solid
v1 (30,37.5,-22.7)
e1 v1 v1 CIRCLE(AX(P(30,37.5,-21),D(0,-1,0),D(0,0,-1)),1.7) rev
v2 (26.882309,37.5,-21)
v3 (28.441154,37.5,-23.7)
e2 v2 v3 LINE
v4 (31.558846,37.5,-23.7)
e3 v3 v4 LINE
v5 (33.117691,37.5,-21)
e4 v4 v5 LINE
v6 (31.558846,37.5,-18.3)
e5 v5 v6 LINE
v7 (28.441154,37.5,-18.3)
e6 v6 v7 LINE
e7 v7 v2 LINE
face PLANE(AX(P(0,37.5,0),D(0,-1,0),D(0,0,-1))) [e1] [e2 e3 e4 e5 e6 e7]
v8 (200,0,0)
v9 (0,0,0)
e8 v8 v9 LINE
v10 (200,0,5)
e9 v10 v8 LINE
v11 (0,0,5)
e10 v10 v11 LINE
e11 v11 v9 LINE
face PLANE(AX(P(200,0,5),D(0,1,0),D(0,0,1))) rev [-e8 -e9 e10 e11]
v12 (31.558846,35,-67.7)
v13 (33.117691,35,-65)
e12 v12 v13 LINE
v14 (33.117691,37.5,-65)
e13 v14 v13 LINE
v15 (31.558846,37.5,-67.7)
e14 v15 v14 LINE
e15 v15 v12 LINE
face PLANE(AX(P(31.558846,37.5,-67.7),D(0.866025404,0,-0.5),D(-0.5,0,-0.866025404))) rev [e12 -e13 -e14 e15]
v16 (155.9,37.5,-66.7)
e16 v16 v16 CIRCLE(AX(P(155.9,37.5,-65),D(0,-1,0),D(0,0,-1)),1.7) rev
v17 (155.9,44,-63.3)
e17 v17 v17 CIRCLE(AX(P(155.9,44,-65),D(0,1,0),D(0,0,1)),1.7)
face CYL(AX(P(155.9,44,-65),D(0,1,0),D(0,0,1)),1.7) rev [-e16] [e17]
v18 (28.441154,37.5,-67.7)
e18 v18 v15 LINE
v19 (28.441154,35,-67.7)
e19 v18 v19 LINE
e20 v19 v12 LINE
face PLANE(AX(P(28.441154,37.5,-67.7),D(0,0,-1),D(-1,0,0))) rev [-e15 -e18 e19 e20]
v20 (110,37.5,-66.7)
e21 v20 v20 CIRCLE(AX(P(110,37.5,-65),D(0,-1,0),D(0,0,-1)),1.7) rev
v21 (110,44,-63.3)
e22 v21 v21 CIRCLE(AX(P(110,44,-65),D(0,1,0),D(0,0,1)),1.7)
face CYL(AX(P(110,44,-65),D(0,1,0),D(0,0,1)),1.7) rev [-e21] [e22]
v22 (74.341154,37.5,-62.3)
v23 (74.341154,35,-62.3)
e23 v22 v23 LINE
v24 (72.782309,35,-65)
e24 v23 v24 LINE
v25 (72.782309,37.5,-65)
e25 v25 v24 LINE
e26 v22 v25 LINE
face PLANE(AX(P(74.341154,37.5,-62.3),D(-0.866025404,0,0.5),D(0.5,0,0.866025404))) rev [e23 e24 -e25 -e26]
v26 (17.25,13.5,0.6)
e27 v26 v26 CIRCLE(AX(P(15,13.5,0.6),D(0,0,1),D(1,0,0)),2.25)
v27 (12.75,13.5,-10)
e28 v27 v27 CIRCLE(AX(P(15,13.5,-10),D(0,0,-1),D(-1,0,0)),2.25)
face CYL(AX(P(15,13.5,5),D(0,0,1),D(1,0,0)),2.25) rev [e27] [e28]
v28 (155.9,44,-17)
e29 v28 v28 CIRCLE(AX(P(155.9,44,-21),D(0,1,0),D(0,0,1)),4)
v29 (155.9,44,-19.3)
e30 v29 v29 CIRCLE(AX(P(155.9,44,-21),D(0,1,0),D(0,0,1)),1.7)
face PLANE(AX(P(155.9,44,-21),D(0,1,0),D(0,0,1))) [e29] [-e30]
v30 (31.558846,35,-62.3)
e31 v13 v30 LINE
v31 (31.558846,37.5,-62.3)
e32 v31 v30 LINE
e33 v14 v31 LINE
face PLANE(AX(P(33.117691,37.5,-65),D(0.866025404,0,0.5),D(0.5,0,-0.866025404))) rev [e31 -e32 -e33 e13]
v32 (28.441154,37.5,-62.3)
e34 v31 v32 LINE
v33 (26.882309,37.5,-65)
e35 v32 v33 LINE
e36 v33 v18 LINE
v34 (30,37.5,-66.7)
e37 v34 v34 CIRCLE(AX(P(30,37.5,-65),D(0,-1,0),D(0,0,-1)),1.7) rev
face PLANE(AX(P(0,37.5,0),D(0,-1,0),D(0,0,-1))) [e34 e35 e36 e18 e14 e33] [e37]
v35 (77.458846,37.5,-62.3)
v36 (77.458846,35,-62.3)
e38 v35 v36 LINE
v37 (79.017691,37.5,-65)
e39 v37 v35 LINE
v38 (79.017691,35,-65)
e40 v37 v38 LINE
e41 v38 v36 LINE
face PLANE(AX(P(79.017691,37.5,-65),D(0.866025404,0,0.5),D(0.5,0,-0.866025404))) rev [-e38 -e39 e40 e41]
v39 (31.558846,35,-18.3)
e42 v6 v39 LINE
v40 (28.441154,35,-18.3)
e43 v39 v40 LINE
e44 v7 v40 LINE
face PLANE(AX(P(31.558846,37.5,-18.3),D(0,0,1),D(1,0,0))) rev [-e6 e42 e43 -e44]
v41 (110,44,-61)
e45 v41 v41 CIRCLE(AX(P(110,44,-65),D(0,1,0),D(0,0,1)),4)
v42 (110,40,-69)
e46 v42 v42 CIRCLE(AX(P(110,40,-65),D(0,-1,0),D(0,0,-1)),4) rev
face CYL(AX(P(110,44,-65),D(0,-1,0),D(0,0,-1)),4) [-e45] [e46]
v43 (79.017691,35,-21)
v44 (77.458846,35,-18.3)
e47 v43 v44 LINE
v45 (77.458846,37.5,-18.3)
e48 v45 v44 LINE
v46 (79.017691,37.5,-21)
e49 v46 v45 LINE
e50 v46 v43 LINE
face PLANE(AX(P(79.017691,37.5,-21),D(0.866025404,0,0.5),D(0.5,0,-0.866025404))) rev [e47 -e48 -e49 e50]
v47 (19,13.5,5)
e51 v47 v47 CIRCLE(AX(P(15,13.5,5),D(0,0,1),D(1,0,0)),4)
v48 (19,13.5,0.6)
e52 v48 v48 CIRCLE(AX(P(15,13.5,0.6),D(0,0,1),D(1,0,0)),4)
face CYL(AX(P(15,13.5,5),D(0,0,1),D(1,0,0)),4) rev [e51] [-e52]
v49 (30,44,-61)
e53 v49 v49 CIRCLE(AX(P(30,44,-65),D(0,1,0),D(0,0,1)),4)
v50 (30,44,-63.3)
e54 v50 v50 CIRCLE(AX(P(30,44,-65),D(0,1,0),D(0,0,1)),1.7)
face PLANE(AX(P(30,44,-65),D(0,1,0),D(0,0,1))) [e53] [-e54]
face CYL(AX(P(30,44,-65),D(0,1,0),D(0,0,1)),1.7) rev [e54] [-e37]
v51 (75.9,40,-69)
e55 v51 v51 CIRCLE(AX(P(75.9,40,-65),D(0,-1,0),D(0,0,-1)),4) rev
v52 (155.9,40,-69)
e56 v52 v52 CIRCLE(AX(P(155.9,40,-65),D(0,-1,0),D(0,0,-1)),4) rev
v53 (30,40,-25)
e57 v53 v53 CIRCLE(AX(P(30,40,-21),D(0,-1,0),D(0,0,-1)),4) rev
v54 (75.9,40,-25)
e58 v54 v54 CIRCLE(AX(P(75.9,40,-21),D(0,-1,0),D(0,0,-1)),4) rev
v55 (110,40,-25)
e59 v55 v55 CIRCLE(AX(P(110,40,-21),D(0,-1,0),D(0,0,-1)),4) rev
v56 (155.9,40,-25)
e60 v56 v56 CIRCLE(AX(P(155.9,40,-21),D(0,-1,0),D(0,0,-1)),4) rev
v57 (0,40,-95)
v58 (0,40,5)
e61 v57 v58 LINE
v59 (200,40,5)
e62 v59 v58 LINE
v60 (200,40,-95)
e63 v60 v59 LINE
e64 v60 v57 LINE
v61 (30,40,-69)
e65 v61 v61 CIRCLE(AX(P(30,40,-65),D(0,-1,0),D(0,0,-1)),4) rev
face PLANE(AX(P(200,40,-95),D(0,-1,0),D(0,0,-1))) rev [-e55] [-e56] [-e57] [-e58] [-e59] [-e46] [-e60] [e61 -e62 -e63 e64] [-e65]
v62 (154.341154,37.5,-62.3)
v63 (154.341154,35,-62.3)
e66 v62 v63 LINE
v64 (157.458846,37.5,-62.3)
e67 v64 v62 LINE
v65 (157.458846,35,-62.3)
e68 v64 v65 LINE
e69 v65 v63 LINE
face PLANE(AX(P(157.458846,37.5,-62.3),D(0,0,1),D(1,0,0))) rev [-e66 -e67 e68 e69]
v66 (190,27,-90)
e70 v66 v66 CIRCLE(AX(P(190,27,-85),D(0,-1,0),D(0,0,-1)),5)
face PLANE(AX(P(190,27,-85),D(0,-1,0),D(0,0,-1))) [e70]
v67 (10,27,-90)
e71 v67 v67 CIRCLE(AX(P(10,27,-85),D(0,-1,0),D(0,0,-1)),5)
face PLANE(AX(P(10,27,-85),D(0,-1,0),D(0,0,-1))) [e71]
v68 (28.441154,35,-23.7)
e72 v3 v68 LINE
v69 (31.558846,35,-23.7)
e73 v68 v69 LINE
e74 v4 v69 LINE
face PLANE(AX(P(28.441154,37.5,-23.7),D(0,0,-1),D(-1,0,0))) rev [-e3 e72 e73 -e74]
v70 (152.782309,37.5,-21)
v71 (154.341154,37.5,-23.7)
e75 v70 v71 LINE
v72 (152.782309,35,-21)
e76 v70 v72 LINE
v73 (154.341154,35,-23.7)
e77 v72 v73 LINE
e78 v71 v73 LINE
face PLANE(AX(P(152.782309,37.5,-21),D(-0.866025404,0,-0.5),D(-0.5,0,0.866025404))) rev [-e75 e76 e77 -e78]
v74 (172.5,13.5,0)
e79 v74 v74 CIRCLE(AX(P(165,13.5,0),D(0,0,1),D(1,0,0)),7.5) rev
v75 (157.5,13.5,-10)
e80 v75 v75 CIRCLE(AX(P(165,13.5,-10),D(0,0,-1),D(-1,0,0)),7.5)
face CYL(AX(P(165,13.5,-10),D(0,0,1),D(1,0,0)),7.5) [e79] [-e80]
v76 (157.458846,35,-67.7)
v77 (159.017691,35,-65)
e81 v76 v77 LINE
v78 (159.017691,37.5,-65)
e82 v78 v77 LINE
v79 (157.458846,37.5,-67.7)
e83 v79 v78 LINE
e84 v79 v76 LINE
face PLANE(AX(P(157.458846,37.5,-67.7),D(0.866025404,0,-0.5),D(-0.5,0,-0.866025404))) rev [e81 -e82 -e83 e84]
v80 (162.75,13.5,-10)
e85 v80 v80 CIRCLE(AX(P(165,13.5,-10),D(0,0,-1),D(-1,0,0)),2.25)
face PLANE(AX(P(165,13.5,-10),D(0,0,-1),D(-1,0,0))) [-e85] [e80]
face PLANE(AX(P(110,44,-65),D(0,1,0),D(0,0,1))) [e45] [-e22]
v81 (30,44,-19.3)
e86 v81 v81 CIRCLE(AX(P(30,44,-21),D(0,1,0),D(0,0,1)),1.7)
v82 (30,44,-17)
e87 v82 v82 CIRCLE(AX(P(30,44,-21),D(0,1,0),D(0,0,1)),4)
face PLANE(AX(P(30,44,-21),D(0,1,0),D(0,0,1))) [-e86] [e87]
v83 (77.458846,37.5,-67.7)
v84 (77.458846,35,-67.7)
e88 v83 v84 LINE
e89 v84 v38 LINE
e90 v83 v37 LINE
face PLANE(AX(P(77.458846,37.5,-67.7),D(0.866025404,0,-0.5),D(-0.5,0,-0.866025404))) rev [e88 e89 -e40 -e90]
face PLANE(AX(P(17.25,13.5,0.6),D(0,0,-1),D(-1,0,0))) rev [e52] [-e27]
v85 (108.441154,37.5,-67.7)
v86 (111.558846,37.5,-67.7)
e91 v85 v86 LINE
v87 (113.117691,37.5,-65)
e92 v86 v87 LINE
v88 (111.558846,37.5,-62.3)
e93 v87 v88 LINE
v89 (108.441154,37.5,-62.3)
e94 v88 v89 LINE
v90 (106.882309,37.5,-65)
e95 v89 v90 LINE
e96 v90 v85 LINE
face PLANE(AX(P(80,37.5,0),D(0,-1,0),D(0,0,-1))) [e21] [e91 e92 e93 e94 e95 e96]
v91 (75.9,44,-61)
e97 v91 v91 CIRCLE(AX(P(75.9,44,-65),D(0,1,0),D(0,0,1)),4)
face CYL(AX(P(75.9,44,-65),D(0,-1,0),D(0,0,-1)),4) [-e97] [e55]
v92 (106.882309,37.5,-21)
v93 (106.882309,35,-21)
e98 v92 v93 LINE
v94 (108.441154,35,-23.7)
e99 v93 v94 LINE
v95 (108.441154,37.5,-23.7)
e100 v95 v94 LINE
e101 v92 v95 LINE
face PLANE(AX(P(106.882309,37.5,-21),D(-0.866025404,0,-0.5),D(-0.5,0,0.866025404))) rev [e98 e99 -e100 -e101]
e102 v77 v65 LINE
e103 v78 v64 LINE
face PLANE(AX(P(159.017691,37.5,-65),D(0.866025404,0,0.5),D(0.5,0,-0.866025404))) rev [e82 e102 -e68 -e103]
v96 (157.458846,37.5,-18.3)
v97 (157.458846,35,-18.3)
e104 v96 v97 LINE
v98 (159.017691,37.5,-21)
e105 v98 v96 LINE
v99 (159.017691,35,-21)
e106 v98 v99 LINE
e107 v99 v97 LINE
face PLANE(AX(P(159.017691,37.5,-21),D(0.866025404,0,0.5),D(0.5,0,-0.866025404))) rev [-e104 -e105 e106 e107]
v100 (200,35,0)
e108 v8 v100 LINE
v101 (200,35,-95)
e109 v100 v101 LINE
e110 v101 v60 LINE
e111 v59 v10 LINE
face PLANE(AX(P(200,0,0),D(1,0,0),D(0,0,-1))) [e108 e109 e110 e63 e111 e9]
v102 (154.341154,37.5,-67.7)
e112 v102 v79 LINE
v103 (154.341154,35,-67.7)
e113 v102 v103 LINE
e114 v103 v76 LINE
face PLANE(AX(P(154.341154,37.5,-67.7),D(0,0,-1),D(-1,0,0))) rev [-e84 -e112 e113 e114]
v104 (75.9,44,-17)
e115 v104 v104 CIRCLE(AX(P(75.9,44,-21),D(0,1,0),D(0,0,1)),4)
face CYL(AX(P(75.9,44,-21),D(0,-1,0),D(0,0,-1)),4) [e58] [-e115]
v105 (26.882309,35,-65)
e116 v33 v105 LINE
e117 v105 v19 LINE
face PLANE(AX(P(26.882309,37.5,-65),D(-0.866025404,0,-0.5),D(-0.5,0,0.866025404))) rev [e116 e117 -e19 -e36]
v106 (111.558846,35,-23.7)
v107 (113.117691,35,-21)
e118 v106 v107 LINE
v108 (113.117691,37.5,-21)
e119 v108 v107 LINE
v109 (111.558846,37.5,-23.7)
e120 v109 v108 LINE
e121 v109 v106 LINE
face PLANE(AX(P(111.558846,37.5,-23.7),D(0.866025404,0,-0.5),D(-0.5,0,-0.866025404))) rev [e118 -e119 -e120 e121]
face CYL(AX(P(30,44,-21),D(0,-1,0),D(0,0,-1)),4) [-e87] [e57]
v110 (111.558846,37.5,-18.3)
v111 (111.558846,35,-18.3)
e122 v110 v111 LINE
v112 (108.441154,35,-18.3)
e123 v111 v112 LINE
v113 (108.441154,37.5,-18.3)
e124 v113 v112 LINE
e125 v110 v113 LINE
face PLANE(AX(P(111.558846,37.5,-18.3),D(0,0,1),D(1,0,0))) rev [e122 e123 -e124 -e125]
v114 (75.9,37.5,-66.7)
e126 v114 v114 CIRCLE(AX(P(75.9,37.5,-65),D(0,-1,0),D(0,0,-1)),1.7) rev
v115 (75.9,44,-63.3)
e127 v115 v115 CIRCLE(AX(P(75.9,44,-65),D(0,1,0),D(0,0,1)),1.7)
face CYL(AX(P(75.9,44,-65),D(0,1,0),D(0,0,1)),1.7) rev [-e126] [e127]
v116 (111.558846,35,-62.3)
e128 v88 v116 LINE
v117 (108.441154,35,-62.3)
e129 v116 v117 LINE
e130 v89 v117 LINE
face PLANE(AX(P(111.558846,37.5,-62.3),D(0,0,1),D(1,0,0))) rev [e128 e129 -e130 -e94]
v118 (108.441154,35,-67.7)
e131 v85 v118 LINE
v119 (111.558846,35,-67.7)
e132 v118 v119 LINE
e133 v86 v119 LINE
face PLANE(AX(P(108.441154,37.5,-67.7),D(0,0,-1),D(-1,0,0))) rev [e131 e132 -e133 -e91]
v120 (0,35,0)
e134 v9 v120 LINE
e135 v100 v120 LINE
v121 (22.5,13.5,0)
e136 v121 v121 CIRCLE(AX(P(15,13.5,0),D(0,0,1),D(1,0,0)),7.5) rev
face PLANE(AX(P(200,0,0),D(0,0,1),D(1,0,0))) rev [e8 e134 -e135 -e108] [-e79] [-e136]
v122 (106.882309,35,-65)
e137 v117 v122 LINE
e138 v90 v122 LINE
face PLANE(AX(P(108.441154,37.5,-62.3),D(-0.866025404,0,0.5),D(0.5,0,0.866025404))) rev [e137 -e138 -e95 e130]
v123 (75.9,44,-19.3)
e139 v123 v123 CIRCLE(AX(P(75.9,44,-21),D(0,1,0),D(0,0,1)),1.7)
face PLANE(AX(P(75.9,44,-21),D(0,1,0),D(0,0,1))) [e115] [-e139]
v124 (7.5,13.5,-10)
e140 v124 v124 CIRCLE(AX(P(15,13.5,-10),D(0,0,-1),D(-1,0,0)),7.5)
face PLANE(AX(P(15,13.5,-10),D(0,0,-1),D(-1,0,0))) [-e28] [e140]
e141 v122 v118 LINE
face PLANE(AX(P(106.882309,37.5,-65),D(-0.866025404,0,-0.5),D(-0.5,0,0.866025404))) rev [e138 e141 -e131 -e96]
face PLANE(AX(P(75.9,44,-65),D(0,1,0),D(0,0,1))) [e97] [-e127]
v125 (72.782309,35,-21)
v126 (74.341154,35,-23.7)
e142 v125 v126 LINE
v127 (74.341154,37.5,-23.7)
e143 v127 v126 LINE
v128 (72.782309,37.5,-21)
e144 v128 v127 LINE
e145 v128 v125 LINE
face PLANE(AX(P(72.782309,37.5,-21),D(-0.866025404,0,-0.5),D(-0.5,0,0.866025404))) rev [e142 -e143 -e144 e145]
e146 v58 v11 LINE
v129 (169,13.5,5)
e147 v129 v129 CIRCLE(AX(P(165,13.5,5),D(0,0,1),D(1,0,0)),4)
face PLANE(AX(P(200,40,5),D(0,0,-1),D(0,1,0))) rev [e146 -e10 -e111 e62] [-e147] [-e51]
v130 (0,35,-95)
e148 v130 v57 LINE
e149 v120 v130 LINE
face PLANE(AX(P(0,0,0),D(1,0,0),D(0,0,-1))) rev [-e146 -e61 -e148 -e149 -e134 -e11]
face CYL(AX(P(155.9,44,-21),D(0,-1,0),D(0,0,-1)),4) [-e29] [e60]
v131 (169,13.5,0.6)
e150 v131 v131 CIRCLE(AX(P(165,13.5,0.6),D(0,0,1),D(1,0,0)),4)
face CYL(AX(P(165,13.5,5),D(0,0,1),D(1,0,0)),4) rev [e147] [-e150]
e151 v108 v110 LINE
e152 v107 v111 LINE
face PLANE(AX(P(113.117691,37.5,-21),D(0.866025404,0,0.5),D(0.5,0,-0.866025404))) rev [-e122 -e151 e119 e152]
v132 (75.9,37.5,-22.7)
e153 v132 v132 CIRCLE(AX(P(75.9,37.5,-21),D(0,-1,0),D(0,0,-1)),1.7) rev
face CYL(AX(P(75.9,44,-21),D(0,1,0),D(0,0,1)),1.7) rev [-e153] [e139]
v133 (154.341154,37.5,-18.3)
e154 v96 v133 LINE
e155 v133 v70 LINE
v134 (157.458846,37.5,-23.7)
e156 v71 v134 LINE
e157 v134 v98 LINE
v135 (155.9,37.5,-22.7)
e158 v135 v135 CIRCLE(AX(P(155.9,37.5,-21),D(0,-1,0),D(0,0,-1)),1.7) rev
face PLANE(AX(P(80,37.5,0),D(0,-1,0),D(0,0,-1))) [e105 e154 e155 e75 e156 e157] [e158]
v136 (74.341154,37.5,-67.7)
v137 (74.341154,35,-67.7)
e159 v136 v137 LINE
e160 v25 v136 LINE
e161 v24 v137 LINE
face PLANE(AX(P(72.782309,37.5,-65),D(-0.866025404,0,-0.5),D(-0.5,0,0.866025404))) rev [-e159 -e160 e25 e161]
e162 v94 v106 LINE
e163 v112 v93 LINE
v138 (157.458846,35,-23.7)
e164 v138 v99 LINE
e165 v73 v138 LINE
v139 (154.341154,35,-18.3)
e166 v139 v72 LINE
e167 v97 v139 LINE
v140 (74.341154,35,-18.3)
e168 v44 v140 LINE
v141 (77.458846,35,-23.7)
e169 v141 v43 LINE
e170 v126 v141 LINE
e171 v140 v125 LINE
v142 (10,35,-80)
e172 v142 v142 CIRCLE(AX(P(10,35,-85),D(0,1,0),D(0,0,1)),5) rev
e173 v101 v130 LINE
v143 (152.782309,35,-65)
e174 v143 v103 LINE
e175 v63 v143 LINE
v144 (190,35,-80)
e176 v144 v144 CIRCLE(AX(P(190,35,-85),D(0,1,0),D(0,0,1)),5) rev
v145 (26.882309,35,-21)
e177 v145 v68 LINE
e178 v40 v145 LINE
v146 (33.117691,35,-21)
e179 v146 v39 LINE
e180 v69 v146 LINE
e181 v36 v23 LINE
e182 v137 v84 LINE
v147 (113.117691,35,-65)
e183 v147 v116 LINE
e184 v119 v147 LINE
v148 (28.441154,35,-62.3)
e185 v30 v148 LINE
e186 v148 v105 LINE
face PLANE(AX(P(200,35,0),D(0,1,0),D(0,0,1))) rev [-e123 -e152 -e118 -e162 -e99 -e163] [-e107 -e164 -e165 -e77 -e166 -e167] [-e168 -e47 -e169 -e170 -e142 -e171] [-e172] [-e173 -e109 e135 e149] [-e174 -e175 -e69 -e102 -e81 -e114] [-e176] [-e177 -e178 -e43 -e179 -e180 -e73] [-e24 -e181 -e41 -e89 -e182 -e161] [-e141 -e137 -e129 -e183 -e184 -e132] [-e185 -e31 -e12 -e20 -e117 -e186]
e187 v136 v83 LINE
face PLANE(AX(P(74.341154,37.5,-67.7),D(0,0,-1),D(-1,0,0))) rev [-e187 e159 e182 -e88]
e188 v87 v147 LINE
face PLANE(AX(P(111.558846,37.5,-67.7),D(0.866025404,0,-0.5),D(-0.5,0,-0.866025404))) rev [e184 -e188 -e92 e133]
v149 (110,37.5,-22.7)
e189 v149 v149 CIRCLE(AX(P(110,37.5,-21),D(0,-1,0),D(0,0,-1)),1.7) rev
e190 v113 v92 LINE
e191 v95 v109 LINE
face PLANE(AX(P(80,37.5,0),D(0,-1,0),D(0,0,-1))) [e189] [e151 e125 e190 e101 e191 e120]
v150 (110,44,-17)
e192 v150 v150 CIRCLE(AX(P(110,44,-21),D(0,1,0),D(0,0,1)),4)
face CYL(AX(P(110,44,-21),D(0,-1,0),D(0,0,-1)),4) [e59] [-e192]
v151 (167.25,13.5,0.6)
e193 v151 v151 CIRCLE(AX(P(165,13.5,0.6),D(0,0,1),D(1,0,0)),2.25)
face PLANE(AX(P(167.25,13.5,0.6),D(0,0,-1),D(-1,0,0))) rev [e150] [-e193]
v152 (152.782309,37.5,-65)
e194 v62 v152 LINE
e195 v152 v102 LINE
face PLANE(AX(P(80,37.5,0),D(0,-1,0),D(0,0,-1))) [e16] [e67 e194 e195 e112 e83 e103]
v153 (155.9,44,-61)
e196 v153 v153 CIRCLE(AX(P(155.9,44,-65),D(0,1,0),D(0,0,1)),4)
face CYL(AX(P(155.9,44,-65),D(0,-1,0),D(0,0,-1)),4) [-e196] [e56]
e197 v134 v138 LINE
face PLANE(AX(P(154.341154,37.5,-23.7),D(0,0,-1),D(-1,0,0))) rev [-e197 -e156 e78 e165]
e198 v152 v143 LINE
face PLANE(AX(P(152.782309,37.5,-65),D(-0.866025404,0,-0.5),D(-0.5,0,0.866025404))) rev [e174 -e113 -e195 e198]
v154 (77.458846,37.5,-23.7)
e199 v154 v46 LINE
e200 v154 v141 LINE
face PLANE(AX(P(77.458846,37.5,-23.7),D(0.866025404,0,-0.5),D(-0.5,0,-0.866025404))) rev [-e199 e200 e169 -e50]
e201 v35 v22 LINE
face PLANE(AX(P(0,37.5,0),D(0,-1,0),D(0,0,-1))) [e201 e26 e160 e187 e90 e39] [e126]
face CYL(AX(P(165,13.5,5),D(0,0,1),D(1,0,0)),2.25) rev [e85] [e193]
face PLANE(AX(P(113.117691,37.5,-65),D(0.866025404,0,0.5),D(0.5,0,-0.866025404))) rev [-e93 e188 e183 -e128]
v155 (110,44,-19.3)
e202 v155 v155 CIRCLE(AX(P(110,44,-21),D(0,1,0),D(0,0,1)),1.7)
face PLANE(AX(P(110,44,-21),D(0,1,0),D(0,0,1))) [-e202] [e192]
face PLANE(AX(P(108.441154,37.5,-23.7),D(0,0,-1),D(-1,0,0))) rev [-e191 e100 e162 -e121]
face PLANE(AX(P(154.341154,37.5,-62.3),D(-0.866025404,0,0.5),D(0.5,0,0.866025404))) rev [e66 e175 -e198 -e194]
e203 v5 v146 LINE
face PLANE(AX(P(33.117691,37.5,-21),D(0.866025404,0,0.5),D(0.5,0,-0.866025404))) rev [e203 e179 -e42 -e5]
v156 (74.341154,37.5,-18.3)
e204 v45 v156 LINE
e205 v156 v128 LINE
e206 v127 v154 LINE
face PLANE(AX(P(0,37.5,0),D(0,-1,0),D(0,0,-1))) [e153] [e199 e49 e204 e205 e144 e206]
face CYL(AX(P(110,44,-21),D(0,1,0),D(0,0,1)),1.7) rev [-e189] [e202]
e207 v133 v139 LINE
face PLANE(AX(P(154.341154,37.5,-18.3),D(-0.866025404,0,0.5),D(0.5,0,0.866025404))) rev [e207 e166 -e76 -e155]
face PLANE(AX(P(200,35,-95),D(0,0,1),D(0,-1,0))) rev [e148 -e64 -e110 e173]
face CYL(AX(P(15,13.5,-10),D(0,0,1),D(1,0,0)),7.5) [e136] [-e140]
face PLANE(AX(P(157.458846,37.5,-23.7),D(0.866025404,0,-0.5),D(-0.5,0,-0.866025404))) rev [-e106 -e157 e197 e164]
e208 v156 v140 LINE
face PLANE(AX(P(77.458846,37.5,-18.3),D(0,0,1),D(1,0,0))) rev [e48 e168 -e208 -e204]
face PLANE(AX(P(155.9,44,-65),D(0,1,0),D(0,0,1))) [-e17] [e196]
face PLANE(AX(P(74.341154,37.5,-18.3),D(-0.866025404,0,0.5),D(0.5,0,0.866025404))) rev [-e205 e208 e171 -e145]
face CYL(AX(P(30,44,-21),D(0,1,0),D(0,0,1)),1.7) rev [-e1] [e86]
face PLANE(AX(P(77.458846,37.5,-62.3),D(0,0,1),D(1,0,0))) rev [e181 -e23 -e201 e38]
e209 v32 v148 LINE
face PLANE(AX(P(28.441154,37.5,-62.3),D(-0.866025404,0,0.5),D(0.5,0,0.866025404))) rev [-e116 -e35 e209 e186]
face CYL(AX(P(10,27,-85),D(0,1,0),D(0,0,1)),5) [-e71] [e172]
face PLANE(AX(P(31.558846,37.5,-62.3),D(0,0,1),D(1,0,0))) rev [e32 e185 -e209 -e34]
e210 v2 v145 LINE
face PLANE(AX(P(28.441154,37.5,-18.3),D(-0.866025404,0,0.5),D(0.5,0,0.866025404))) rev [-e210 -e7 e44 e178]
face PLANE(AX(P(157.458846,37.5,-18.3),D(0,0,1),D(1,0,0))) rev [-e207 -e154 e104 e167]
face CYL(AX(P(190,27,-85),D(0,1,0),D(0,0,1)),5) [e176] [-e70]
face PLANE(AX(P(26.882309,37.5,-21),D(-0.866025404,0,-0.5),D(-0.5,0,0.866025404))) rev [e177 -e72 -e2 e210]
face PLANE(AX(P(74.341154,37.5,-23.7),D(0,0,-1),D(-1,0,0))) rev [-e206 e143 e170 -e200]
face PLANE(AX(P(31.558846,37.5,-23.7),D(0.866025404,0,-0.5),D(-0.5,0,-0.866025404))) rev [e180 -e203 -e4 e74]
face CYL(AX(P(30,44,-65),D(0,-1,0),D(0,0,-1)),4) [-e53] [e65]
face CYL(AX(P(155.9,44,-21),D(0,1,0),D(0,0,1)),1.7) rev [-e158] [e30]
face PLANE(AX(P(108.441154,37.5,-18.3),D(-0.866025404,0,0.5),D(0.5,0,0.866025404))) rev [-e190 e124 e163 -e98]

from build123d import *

# Parameters (mm, degrees)
BODY_DEPTH                        = 200
SKETCH4_R                         = 7.5
MOUNTING_NOBS_DEPTH               = 10
SIDE_MOUNTING_HOLES_START         = -10
SIDE_MOUNTING_HOLES_OUTLINE_R     = 2.25
SIDE_MOUNTING_HOLES_DEPTH         = 15
SIDE_MOUNTING_HOLES_START_2       = 0.6
SIDE_MOUNTING_HOLES_2_OUTLINE_R   = 4
SIDE_MOUNTING_HOLES_2_OUTLINE_R_2 = 2.25
SIDE_MOUNTING_HOLES_2_DEPTH       = 4.4
SKETCH8_R                         = 4
DC_DRIVER_NOBS_DEPTH              = 4
DC_DRIVER_MOUNTING_START          = 35
DC_DRIVER_MOUNTING_OUTLINE_R      = 1.7
DC_DRIVER_MOUNTING_DEPTH          = 9
DC_DRIVER_NUT_CUTS_DEPTH          = 2.5
DC_DRIVER_PATTERN_COUNT           = 2
DC_DRIVER_PATTERN_PITCH           = 80
SKETCH13_R                        = 5
SUPPORT_NOBS_DEPTH                = 8


# Read off the part's stored shape, not the designer's step: side_mounting_holes, dc_driver_mounting
with BuildPart() as part:
    # Sketch1 → body (new body)
    with BuildSketch(Plane(origin=(0, 0, 0), x_dir=(0, 0, -1), z_dir=(1, 0, 0))):
        Polygon((0, 0), (0, 35), (95, 35), (95, 40), (-5, 40), (-5, 0), align=None)
    extrude(amount=BODY_DEPTH)

    # Sketch4 → mounting_nobs (add)
    with BuildSketch(Plane(origin=(0, 0, 0), x_dir=(-1, 0, 0), z_dir=(0, 0, -1))):
        with Locations(Location((-165, 13.5, 0), (0, 0, 180))):
            Circle(SKETCH4_R)
        with Locations(Location((-15, 13.5, 0), (0, 0, 180))):
            Circle(SKETCH4_R)
    extrude(amount=MOUNTING_NOBS_DEPTH)

    # side_mounting_holes outline → side_mounting_holes (cut)
    with BuildSketch(Plane.XY.offset(SIDE_MOUNTING_HOLES_START)):
        with Locations((165, 13.5)):
            Circle(SIDE_MOUNTING_HOLES_OUTLINE_R)
        with Locations((15, 13.5)):
            Circle(SIDE_MOUNTING_HOLES_OUTLINE_R)
    extrude(amount=SIDE_MOUNTING_HOLES_DEPTH, mode=Mode.SUBTRACT)

    # side_mounting_holes 2 outline → side_mounting_holes 2 (cut)
    # profile 1 of 2: a face of its own
    with BuildSketch(Plane.XY.offset(SIDE_MOUNTING_HOLES_START_2)):
        with Locations((165, 13.5)):
            Circle(SIDE_MOUNTING_HOLES_2_OUTLINE_R)
        with Locations((165, 13.5)):
            Circle(SIDE_MOUNTING_HOLES_2_OUTLINE_R_2, mode=Mode.SUBTRACT)
    # profile 2 of 2: a face of its own
    with BuildSketch(Plane.XY.offset(SIDE_MOUNTING_HOLES_START_2)):
        with Locations((15, 13.5)):
            Circle(SIDE_MOUNTING_HOLES_2_OUTLINE_R)
        with Locations((15, 13.5)):
            Circle(SIDE_MOUNTING_HOLES_2_OUTLINE_R_2, mode=Mode.SUBTRACT)
    extrude(amount=SIDE_MOUNTING_HOLES_2_DEPTH, mode=Mode.SUBTRACT)

    # Sketch8 → dc_driver_nobs (add)
    with BuildSketch(Plane(origin=(0, 40, 0), x_dir=(1, 0, 0), z_dir=(0, 1, 0))):
        with Locations(Location((30, 65, 0), (0, 0, 90))):
            Circle(SKETCH8_R)
        with Locations(Location((75.9, 65, 0), (0, 0, 90))):
            Circle(SKETCH8_R)
        with Locations(Location((30, 21, 0), (0, 0, 90))):
            Circle(SKETCH8_R)
        with Locations(Location((75.9, 21, 0), (0, 0, 90))):
            Circle(SKETCH8_R)
    dc_driver_nobs = extrude(amount=DC_DRIVER_NOBS_DEPTH)

    # dc_driver_mounting outline → dc_driver_mounting (cut)
    with BuildSketch(Plane(origin=(0, 0, 0), x_dir=(1, 0, 0), z_dir=(0, 1, 0)).offset(DC_DRIVER_MOUNTING_START)):
        with Locations((75.9, 65)):
            Circle(DC_DRIVER_MOUNTING_OUTLINE_R)
        with Locations((30, 21)):
            Circle(DC_DRIVER_MOUNTING_OUTLINE_R)
        with Locations((75.9, 21)):
            Circle(DC_DRIVER_MOUNTING_OUTLINE_R)
        with Locations((30, 65)):
            Circle(DC_DRIVER_MOUNTING_OUTLINE_R)
    dc_driver_mounting = extrude(amount=DC_DRIVER_MOUNTING_DEPTH, mode=Mode.SUBTRACT)

    # Sketch12 → dc_driver_nut_cuts (cut)
    with BuildSketch(Plane.XZ.offset(-35)):
        Polygon((33.117691454, -21), (31.558845727, -18.3), (28.441154273, -18.3), (26.882308546, -21), (28.441154273, -23.7), (31.558845727, -23.7), align=None)
        Polygon((79.017691454, -21), (77.458845727, -18.3), (74.341154273, -18.3), (72.782308546, -21), (74.341154273, -23.7), (77.458845727, -23.7), align=None)
        Polygon((79.017691454, -65), (77.458845727, -62.3), (74.341154273, -62.3), (72.782308546, -65), (74.341154273, -67.7), (77.458845727, -67.7), align=None)
        Polygon((33.117691454, -65), (31.558845727, -62.3), (28.441154273, -62.3), (26.882308546, -65), (28.441154273, -67.7), (31.558845727, -67.7), align=None)
    dc_driver_nut_cuts = extrude(amount=-DC_DRIVER_NUT_CUTS_DEPTH, mode=Mode.SUBTRACT)

    # dc_driver_pattern: dc_driver_nobs, dc_driver_mounting, dc_driver_nut_cuts ×2
    with Locations(*[(i * DC_DRIVER_PATTERN_PITCH, 0, 0) for i in range(1, DC_DRIVER_PATTERN_COUNT)]):
        add(dc_driver_nobs)
        add(dc_driver_mounting, mode=Mode.SUBTRACT)
        add(dc_driver_nut_cuts, mode=Mode.SUBTRACT)

    # Sketch13 → support_nobs (add)
    with BuildSketch(Plane.XZ.offset(-35)):
        with Locations(Location((10, -85, 0), (0, 0, 90))):
            Circle(SKETCH13_R)
        with Locations(Location((190, -85, 0), (0, 0, 90))):
            Circle(SKETCH13_R)
    extrude(amount=SUPPORT_NOBS_DEPTH)


solid = part.part
